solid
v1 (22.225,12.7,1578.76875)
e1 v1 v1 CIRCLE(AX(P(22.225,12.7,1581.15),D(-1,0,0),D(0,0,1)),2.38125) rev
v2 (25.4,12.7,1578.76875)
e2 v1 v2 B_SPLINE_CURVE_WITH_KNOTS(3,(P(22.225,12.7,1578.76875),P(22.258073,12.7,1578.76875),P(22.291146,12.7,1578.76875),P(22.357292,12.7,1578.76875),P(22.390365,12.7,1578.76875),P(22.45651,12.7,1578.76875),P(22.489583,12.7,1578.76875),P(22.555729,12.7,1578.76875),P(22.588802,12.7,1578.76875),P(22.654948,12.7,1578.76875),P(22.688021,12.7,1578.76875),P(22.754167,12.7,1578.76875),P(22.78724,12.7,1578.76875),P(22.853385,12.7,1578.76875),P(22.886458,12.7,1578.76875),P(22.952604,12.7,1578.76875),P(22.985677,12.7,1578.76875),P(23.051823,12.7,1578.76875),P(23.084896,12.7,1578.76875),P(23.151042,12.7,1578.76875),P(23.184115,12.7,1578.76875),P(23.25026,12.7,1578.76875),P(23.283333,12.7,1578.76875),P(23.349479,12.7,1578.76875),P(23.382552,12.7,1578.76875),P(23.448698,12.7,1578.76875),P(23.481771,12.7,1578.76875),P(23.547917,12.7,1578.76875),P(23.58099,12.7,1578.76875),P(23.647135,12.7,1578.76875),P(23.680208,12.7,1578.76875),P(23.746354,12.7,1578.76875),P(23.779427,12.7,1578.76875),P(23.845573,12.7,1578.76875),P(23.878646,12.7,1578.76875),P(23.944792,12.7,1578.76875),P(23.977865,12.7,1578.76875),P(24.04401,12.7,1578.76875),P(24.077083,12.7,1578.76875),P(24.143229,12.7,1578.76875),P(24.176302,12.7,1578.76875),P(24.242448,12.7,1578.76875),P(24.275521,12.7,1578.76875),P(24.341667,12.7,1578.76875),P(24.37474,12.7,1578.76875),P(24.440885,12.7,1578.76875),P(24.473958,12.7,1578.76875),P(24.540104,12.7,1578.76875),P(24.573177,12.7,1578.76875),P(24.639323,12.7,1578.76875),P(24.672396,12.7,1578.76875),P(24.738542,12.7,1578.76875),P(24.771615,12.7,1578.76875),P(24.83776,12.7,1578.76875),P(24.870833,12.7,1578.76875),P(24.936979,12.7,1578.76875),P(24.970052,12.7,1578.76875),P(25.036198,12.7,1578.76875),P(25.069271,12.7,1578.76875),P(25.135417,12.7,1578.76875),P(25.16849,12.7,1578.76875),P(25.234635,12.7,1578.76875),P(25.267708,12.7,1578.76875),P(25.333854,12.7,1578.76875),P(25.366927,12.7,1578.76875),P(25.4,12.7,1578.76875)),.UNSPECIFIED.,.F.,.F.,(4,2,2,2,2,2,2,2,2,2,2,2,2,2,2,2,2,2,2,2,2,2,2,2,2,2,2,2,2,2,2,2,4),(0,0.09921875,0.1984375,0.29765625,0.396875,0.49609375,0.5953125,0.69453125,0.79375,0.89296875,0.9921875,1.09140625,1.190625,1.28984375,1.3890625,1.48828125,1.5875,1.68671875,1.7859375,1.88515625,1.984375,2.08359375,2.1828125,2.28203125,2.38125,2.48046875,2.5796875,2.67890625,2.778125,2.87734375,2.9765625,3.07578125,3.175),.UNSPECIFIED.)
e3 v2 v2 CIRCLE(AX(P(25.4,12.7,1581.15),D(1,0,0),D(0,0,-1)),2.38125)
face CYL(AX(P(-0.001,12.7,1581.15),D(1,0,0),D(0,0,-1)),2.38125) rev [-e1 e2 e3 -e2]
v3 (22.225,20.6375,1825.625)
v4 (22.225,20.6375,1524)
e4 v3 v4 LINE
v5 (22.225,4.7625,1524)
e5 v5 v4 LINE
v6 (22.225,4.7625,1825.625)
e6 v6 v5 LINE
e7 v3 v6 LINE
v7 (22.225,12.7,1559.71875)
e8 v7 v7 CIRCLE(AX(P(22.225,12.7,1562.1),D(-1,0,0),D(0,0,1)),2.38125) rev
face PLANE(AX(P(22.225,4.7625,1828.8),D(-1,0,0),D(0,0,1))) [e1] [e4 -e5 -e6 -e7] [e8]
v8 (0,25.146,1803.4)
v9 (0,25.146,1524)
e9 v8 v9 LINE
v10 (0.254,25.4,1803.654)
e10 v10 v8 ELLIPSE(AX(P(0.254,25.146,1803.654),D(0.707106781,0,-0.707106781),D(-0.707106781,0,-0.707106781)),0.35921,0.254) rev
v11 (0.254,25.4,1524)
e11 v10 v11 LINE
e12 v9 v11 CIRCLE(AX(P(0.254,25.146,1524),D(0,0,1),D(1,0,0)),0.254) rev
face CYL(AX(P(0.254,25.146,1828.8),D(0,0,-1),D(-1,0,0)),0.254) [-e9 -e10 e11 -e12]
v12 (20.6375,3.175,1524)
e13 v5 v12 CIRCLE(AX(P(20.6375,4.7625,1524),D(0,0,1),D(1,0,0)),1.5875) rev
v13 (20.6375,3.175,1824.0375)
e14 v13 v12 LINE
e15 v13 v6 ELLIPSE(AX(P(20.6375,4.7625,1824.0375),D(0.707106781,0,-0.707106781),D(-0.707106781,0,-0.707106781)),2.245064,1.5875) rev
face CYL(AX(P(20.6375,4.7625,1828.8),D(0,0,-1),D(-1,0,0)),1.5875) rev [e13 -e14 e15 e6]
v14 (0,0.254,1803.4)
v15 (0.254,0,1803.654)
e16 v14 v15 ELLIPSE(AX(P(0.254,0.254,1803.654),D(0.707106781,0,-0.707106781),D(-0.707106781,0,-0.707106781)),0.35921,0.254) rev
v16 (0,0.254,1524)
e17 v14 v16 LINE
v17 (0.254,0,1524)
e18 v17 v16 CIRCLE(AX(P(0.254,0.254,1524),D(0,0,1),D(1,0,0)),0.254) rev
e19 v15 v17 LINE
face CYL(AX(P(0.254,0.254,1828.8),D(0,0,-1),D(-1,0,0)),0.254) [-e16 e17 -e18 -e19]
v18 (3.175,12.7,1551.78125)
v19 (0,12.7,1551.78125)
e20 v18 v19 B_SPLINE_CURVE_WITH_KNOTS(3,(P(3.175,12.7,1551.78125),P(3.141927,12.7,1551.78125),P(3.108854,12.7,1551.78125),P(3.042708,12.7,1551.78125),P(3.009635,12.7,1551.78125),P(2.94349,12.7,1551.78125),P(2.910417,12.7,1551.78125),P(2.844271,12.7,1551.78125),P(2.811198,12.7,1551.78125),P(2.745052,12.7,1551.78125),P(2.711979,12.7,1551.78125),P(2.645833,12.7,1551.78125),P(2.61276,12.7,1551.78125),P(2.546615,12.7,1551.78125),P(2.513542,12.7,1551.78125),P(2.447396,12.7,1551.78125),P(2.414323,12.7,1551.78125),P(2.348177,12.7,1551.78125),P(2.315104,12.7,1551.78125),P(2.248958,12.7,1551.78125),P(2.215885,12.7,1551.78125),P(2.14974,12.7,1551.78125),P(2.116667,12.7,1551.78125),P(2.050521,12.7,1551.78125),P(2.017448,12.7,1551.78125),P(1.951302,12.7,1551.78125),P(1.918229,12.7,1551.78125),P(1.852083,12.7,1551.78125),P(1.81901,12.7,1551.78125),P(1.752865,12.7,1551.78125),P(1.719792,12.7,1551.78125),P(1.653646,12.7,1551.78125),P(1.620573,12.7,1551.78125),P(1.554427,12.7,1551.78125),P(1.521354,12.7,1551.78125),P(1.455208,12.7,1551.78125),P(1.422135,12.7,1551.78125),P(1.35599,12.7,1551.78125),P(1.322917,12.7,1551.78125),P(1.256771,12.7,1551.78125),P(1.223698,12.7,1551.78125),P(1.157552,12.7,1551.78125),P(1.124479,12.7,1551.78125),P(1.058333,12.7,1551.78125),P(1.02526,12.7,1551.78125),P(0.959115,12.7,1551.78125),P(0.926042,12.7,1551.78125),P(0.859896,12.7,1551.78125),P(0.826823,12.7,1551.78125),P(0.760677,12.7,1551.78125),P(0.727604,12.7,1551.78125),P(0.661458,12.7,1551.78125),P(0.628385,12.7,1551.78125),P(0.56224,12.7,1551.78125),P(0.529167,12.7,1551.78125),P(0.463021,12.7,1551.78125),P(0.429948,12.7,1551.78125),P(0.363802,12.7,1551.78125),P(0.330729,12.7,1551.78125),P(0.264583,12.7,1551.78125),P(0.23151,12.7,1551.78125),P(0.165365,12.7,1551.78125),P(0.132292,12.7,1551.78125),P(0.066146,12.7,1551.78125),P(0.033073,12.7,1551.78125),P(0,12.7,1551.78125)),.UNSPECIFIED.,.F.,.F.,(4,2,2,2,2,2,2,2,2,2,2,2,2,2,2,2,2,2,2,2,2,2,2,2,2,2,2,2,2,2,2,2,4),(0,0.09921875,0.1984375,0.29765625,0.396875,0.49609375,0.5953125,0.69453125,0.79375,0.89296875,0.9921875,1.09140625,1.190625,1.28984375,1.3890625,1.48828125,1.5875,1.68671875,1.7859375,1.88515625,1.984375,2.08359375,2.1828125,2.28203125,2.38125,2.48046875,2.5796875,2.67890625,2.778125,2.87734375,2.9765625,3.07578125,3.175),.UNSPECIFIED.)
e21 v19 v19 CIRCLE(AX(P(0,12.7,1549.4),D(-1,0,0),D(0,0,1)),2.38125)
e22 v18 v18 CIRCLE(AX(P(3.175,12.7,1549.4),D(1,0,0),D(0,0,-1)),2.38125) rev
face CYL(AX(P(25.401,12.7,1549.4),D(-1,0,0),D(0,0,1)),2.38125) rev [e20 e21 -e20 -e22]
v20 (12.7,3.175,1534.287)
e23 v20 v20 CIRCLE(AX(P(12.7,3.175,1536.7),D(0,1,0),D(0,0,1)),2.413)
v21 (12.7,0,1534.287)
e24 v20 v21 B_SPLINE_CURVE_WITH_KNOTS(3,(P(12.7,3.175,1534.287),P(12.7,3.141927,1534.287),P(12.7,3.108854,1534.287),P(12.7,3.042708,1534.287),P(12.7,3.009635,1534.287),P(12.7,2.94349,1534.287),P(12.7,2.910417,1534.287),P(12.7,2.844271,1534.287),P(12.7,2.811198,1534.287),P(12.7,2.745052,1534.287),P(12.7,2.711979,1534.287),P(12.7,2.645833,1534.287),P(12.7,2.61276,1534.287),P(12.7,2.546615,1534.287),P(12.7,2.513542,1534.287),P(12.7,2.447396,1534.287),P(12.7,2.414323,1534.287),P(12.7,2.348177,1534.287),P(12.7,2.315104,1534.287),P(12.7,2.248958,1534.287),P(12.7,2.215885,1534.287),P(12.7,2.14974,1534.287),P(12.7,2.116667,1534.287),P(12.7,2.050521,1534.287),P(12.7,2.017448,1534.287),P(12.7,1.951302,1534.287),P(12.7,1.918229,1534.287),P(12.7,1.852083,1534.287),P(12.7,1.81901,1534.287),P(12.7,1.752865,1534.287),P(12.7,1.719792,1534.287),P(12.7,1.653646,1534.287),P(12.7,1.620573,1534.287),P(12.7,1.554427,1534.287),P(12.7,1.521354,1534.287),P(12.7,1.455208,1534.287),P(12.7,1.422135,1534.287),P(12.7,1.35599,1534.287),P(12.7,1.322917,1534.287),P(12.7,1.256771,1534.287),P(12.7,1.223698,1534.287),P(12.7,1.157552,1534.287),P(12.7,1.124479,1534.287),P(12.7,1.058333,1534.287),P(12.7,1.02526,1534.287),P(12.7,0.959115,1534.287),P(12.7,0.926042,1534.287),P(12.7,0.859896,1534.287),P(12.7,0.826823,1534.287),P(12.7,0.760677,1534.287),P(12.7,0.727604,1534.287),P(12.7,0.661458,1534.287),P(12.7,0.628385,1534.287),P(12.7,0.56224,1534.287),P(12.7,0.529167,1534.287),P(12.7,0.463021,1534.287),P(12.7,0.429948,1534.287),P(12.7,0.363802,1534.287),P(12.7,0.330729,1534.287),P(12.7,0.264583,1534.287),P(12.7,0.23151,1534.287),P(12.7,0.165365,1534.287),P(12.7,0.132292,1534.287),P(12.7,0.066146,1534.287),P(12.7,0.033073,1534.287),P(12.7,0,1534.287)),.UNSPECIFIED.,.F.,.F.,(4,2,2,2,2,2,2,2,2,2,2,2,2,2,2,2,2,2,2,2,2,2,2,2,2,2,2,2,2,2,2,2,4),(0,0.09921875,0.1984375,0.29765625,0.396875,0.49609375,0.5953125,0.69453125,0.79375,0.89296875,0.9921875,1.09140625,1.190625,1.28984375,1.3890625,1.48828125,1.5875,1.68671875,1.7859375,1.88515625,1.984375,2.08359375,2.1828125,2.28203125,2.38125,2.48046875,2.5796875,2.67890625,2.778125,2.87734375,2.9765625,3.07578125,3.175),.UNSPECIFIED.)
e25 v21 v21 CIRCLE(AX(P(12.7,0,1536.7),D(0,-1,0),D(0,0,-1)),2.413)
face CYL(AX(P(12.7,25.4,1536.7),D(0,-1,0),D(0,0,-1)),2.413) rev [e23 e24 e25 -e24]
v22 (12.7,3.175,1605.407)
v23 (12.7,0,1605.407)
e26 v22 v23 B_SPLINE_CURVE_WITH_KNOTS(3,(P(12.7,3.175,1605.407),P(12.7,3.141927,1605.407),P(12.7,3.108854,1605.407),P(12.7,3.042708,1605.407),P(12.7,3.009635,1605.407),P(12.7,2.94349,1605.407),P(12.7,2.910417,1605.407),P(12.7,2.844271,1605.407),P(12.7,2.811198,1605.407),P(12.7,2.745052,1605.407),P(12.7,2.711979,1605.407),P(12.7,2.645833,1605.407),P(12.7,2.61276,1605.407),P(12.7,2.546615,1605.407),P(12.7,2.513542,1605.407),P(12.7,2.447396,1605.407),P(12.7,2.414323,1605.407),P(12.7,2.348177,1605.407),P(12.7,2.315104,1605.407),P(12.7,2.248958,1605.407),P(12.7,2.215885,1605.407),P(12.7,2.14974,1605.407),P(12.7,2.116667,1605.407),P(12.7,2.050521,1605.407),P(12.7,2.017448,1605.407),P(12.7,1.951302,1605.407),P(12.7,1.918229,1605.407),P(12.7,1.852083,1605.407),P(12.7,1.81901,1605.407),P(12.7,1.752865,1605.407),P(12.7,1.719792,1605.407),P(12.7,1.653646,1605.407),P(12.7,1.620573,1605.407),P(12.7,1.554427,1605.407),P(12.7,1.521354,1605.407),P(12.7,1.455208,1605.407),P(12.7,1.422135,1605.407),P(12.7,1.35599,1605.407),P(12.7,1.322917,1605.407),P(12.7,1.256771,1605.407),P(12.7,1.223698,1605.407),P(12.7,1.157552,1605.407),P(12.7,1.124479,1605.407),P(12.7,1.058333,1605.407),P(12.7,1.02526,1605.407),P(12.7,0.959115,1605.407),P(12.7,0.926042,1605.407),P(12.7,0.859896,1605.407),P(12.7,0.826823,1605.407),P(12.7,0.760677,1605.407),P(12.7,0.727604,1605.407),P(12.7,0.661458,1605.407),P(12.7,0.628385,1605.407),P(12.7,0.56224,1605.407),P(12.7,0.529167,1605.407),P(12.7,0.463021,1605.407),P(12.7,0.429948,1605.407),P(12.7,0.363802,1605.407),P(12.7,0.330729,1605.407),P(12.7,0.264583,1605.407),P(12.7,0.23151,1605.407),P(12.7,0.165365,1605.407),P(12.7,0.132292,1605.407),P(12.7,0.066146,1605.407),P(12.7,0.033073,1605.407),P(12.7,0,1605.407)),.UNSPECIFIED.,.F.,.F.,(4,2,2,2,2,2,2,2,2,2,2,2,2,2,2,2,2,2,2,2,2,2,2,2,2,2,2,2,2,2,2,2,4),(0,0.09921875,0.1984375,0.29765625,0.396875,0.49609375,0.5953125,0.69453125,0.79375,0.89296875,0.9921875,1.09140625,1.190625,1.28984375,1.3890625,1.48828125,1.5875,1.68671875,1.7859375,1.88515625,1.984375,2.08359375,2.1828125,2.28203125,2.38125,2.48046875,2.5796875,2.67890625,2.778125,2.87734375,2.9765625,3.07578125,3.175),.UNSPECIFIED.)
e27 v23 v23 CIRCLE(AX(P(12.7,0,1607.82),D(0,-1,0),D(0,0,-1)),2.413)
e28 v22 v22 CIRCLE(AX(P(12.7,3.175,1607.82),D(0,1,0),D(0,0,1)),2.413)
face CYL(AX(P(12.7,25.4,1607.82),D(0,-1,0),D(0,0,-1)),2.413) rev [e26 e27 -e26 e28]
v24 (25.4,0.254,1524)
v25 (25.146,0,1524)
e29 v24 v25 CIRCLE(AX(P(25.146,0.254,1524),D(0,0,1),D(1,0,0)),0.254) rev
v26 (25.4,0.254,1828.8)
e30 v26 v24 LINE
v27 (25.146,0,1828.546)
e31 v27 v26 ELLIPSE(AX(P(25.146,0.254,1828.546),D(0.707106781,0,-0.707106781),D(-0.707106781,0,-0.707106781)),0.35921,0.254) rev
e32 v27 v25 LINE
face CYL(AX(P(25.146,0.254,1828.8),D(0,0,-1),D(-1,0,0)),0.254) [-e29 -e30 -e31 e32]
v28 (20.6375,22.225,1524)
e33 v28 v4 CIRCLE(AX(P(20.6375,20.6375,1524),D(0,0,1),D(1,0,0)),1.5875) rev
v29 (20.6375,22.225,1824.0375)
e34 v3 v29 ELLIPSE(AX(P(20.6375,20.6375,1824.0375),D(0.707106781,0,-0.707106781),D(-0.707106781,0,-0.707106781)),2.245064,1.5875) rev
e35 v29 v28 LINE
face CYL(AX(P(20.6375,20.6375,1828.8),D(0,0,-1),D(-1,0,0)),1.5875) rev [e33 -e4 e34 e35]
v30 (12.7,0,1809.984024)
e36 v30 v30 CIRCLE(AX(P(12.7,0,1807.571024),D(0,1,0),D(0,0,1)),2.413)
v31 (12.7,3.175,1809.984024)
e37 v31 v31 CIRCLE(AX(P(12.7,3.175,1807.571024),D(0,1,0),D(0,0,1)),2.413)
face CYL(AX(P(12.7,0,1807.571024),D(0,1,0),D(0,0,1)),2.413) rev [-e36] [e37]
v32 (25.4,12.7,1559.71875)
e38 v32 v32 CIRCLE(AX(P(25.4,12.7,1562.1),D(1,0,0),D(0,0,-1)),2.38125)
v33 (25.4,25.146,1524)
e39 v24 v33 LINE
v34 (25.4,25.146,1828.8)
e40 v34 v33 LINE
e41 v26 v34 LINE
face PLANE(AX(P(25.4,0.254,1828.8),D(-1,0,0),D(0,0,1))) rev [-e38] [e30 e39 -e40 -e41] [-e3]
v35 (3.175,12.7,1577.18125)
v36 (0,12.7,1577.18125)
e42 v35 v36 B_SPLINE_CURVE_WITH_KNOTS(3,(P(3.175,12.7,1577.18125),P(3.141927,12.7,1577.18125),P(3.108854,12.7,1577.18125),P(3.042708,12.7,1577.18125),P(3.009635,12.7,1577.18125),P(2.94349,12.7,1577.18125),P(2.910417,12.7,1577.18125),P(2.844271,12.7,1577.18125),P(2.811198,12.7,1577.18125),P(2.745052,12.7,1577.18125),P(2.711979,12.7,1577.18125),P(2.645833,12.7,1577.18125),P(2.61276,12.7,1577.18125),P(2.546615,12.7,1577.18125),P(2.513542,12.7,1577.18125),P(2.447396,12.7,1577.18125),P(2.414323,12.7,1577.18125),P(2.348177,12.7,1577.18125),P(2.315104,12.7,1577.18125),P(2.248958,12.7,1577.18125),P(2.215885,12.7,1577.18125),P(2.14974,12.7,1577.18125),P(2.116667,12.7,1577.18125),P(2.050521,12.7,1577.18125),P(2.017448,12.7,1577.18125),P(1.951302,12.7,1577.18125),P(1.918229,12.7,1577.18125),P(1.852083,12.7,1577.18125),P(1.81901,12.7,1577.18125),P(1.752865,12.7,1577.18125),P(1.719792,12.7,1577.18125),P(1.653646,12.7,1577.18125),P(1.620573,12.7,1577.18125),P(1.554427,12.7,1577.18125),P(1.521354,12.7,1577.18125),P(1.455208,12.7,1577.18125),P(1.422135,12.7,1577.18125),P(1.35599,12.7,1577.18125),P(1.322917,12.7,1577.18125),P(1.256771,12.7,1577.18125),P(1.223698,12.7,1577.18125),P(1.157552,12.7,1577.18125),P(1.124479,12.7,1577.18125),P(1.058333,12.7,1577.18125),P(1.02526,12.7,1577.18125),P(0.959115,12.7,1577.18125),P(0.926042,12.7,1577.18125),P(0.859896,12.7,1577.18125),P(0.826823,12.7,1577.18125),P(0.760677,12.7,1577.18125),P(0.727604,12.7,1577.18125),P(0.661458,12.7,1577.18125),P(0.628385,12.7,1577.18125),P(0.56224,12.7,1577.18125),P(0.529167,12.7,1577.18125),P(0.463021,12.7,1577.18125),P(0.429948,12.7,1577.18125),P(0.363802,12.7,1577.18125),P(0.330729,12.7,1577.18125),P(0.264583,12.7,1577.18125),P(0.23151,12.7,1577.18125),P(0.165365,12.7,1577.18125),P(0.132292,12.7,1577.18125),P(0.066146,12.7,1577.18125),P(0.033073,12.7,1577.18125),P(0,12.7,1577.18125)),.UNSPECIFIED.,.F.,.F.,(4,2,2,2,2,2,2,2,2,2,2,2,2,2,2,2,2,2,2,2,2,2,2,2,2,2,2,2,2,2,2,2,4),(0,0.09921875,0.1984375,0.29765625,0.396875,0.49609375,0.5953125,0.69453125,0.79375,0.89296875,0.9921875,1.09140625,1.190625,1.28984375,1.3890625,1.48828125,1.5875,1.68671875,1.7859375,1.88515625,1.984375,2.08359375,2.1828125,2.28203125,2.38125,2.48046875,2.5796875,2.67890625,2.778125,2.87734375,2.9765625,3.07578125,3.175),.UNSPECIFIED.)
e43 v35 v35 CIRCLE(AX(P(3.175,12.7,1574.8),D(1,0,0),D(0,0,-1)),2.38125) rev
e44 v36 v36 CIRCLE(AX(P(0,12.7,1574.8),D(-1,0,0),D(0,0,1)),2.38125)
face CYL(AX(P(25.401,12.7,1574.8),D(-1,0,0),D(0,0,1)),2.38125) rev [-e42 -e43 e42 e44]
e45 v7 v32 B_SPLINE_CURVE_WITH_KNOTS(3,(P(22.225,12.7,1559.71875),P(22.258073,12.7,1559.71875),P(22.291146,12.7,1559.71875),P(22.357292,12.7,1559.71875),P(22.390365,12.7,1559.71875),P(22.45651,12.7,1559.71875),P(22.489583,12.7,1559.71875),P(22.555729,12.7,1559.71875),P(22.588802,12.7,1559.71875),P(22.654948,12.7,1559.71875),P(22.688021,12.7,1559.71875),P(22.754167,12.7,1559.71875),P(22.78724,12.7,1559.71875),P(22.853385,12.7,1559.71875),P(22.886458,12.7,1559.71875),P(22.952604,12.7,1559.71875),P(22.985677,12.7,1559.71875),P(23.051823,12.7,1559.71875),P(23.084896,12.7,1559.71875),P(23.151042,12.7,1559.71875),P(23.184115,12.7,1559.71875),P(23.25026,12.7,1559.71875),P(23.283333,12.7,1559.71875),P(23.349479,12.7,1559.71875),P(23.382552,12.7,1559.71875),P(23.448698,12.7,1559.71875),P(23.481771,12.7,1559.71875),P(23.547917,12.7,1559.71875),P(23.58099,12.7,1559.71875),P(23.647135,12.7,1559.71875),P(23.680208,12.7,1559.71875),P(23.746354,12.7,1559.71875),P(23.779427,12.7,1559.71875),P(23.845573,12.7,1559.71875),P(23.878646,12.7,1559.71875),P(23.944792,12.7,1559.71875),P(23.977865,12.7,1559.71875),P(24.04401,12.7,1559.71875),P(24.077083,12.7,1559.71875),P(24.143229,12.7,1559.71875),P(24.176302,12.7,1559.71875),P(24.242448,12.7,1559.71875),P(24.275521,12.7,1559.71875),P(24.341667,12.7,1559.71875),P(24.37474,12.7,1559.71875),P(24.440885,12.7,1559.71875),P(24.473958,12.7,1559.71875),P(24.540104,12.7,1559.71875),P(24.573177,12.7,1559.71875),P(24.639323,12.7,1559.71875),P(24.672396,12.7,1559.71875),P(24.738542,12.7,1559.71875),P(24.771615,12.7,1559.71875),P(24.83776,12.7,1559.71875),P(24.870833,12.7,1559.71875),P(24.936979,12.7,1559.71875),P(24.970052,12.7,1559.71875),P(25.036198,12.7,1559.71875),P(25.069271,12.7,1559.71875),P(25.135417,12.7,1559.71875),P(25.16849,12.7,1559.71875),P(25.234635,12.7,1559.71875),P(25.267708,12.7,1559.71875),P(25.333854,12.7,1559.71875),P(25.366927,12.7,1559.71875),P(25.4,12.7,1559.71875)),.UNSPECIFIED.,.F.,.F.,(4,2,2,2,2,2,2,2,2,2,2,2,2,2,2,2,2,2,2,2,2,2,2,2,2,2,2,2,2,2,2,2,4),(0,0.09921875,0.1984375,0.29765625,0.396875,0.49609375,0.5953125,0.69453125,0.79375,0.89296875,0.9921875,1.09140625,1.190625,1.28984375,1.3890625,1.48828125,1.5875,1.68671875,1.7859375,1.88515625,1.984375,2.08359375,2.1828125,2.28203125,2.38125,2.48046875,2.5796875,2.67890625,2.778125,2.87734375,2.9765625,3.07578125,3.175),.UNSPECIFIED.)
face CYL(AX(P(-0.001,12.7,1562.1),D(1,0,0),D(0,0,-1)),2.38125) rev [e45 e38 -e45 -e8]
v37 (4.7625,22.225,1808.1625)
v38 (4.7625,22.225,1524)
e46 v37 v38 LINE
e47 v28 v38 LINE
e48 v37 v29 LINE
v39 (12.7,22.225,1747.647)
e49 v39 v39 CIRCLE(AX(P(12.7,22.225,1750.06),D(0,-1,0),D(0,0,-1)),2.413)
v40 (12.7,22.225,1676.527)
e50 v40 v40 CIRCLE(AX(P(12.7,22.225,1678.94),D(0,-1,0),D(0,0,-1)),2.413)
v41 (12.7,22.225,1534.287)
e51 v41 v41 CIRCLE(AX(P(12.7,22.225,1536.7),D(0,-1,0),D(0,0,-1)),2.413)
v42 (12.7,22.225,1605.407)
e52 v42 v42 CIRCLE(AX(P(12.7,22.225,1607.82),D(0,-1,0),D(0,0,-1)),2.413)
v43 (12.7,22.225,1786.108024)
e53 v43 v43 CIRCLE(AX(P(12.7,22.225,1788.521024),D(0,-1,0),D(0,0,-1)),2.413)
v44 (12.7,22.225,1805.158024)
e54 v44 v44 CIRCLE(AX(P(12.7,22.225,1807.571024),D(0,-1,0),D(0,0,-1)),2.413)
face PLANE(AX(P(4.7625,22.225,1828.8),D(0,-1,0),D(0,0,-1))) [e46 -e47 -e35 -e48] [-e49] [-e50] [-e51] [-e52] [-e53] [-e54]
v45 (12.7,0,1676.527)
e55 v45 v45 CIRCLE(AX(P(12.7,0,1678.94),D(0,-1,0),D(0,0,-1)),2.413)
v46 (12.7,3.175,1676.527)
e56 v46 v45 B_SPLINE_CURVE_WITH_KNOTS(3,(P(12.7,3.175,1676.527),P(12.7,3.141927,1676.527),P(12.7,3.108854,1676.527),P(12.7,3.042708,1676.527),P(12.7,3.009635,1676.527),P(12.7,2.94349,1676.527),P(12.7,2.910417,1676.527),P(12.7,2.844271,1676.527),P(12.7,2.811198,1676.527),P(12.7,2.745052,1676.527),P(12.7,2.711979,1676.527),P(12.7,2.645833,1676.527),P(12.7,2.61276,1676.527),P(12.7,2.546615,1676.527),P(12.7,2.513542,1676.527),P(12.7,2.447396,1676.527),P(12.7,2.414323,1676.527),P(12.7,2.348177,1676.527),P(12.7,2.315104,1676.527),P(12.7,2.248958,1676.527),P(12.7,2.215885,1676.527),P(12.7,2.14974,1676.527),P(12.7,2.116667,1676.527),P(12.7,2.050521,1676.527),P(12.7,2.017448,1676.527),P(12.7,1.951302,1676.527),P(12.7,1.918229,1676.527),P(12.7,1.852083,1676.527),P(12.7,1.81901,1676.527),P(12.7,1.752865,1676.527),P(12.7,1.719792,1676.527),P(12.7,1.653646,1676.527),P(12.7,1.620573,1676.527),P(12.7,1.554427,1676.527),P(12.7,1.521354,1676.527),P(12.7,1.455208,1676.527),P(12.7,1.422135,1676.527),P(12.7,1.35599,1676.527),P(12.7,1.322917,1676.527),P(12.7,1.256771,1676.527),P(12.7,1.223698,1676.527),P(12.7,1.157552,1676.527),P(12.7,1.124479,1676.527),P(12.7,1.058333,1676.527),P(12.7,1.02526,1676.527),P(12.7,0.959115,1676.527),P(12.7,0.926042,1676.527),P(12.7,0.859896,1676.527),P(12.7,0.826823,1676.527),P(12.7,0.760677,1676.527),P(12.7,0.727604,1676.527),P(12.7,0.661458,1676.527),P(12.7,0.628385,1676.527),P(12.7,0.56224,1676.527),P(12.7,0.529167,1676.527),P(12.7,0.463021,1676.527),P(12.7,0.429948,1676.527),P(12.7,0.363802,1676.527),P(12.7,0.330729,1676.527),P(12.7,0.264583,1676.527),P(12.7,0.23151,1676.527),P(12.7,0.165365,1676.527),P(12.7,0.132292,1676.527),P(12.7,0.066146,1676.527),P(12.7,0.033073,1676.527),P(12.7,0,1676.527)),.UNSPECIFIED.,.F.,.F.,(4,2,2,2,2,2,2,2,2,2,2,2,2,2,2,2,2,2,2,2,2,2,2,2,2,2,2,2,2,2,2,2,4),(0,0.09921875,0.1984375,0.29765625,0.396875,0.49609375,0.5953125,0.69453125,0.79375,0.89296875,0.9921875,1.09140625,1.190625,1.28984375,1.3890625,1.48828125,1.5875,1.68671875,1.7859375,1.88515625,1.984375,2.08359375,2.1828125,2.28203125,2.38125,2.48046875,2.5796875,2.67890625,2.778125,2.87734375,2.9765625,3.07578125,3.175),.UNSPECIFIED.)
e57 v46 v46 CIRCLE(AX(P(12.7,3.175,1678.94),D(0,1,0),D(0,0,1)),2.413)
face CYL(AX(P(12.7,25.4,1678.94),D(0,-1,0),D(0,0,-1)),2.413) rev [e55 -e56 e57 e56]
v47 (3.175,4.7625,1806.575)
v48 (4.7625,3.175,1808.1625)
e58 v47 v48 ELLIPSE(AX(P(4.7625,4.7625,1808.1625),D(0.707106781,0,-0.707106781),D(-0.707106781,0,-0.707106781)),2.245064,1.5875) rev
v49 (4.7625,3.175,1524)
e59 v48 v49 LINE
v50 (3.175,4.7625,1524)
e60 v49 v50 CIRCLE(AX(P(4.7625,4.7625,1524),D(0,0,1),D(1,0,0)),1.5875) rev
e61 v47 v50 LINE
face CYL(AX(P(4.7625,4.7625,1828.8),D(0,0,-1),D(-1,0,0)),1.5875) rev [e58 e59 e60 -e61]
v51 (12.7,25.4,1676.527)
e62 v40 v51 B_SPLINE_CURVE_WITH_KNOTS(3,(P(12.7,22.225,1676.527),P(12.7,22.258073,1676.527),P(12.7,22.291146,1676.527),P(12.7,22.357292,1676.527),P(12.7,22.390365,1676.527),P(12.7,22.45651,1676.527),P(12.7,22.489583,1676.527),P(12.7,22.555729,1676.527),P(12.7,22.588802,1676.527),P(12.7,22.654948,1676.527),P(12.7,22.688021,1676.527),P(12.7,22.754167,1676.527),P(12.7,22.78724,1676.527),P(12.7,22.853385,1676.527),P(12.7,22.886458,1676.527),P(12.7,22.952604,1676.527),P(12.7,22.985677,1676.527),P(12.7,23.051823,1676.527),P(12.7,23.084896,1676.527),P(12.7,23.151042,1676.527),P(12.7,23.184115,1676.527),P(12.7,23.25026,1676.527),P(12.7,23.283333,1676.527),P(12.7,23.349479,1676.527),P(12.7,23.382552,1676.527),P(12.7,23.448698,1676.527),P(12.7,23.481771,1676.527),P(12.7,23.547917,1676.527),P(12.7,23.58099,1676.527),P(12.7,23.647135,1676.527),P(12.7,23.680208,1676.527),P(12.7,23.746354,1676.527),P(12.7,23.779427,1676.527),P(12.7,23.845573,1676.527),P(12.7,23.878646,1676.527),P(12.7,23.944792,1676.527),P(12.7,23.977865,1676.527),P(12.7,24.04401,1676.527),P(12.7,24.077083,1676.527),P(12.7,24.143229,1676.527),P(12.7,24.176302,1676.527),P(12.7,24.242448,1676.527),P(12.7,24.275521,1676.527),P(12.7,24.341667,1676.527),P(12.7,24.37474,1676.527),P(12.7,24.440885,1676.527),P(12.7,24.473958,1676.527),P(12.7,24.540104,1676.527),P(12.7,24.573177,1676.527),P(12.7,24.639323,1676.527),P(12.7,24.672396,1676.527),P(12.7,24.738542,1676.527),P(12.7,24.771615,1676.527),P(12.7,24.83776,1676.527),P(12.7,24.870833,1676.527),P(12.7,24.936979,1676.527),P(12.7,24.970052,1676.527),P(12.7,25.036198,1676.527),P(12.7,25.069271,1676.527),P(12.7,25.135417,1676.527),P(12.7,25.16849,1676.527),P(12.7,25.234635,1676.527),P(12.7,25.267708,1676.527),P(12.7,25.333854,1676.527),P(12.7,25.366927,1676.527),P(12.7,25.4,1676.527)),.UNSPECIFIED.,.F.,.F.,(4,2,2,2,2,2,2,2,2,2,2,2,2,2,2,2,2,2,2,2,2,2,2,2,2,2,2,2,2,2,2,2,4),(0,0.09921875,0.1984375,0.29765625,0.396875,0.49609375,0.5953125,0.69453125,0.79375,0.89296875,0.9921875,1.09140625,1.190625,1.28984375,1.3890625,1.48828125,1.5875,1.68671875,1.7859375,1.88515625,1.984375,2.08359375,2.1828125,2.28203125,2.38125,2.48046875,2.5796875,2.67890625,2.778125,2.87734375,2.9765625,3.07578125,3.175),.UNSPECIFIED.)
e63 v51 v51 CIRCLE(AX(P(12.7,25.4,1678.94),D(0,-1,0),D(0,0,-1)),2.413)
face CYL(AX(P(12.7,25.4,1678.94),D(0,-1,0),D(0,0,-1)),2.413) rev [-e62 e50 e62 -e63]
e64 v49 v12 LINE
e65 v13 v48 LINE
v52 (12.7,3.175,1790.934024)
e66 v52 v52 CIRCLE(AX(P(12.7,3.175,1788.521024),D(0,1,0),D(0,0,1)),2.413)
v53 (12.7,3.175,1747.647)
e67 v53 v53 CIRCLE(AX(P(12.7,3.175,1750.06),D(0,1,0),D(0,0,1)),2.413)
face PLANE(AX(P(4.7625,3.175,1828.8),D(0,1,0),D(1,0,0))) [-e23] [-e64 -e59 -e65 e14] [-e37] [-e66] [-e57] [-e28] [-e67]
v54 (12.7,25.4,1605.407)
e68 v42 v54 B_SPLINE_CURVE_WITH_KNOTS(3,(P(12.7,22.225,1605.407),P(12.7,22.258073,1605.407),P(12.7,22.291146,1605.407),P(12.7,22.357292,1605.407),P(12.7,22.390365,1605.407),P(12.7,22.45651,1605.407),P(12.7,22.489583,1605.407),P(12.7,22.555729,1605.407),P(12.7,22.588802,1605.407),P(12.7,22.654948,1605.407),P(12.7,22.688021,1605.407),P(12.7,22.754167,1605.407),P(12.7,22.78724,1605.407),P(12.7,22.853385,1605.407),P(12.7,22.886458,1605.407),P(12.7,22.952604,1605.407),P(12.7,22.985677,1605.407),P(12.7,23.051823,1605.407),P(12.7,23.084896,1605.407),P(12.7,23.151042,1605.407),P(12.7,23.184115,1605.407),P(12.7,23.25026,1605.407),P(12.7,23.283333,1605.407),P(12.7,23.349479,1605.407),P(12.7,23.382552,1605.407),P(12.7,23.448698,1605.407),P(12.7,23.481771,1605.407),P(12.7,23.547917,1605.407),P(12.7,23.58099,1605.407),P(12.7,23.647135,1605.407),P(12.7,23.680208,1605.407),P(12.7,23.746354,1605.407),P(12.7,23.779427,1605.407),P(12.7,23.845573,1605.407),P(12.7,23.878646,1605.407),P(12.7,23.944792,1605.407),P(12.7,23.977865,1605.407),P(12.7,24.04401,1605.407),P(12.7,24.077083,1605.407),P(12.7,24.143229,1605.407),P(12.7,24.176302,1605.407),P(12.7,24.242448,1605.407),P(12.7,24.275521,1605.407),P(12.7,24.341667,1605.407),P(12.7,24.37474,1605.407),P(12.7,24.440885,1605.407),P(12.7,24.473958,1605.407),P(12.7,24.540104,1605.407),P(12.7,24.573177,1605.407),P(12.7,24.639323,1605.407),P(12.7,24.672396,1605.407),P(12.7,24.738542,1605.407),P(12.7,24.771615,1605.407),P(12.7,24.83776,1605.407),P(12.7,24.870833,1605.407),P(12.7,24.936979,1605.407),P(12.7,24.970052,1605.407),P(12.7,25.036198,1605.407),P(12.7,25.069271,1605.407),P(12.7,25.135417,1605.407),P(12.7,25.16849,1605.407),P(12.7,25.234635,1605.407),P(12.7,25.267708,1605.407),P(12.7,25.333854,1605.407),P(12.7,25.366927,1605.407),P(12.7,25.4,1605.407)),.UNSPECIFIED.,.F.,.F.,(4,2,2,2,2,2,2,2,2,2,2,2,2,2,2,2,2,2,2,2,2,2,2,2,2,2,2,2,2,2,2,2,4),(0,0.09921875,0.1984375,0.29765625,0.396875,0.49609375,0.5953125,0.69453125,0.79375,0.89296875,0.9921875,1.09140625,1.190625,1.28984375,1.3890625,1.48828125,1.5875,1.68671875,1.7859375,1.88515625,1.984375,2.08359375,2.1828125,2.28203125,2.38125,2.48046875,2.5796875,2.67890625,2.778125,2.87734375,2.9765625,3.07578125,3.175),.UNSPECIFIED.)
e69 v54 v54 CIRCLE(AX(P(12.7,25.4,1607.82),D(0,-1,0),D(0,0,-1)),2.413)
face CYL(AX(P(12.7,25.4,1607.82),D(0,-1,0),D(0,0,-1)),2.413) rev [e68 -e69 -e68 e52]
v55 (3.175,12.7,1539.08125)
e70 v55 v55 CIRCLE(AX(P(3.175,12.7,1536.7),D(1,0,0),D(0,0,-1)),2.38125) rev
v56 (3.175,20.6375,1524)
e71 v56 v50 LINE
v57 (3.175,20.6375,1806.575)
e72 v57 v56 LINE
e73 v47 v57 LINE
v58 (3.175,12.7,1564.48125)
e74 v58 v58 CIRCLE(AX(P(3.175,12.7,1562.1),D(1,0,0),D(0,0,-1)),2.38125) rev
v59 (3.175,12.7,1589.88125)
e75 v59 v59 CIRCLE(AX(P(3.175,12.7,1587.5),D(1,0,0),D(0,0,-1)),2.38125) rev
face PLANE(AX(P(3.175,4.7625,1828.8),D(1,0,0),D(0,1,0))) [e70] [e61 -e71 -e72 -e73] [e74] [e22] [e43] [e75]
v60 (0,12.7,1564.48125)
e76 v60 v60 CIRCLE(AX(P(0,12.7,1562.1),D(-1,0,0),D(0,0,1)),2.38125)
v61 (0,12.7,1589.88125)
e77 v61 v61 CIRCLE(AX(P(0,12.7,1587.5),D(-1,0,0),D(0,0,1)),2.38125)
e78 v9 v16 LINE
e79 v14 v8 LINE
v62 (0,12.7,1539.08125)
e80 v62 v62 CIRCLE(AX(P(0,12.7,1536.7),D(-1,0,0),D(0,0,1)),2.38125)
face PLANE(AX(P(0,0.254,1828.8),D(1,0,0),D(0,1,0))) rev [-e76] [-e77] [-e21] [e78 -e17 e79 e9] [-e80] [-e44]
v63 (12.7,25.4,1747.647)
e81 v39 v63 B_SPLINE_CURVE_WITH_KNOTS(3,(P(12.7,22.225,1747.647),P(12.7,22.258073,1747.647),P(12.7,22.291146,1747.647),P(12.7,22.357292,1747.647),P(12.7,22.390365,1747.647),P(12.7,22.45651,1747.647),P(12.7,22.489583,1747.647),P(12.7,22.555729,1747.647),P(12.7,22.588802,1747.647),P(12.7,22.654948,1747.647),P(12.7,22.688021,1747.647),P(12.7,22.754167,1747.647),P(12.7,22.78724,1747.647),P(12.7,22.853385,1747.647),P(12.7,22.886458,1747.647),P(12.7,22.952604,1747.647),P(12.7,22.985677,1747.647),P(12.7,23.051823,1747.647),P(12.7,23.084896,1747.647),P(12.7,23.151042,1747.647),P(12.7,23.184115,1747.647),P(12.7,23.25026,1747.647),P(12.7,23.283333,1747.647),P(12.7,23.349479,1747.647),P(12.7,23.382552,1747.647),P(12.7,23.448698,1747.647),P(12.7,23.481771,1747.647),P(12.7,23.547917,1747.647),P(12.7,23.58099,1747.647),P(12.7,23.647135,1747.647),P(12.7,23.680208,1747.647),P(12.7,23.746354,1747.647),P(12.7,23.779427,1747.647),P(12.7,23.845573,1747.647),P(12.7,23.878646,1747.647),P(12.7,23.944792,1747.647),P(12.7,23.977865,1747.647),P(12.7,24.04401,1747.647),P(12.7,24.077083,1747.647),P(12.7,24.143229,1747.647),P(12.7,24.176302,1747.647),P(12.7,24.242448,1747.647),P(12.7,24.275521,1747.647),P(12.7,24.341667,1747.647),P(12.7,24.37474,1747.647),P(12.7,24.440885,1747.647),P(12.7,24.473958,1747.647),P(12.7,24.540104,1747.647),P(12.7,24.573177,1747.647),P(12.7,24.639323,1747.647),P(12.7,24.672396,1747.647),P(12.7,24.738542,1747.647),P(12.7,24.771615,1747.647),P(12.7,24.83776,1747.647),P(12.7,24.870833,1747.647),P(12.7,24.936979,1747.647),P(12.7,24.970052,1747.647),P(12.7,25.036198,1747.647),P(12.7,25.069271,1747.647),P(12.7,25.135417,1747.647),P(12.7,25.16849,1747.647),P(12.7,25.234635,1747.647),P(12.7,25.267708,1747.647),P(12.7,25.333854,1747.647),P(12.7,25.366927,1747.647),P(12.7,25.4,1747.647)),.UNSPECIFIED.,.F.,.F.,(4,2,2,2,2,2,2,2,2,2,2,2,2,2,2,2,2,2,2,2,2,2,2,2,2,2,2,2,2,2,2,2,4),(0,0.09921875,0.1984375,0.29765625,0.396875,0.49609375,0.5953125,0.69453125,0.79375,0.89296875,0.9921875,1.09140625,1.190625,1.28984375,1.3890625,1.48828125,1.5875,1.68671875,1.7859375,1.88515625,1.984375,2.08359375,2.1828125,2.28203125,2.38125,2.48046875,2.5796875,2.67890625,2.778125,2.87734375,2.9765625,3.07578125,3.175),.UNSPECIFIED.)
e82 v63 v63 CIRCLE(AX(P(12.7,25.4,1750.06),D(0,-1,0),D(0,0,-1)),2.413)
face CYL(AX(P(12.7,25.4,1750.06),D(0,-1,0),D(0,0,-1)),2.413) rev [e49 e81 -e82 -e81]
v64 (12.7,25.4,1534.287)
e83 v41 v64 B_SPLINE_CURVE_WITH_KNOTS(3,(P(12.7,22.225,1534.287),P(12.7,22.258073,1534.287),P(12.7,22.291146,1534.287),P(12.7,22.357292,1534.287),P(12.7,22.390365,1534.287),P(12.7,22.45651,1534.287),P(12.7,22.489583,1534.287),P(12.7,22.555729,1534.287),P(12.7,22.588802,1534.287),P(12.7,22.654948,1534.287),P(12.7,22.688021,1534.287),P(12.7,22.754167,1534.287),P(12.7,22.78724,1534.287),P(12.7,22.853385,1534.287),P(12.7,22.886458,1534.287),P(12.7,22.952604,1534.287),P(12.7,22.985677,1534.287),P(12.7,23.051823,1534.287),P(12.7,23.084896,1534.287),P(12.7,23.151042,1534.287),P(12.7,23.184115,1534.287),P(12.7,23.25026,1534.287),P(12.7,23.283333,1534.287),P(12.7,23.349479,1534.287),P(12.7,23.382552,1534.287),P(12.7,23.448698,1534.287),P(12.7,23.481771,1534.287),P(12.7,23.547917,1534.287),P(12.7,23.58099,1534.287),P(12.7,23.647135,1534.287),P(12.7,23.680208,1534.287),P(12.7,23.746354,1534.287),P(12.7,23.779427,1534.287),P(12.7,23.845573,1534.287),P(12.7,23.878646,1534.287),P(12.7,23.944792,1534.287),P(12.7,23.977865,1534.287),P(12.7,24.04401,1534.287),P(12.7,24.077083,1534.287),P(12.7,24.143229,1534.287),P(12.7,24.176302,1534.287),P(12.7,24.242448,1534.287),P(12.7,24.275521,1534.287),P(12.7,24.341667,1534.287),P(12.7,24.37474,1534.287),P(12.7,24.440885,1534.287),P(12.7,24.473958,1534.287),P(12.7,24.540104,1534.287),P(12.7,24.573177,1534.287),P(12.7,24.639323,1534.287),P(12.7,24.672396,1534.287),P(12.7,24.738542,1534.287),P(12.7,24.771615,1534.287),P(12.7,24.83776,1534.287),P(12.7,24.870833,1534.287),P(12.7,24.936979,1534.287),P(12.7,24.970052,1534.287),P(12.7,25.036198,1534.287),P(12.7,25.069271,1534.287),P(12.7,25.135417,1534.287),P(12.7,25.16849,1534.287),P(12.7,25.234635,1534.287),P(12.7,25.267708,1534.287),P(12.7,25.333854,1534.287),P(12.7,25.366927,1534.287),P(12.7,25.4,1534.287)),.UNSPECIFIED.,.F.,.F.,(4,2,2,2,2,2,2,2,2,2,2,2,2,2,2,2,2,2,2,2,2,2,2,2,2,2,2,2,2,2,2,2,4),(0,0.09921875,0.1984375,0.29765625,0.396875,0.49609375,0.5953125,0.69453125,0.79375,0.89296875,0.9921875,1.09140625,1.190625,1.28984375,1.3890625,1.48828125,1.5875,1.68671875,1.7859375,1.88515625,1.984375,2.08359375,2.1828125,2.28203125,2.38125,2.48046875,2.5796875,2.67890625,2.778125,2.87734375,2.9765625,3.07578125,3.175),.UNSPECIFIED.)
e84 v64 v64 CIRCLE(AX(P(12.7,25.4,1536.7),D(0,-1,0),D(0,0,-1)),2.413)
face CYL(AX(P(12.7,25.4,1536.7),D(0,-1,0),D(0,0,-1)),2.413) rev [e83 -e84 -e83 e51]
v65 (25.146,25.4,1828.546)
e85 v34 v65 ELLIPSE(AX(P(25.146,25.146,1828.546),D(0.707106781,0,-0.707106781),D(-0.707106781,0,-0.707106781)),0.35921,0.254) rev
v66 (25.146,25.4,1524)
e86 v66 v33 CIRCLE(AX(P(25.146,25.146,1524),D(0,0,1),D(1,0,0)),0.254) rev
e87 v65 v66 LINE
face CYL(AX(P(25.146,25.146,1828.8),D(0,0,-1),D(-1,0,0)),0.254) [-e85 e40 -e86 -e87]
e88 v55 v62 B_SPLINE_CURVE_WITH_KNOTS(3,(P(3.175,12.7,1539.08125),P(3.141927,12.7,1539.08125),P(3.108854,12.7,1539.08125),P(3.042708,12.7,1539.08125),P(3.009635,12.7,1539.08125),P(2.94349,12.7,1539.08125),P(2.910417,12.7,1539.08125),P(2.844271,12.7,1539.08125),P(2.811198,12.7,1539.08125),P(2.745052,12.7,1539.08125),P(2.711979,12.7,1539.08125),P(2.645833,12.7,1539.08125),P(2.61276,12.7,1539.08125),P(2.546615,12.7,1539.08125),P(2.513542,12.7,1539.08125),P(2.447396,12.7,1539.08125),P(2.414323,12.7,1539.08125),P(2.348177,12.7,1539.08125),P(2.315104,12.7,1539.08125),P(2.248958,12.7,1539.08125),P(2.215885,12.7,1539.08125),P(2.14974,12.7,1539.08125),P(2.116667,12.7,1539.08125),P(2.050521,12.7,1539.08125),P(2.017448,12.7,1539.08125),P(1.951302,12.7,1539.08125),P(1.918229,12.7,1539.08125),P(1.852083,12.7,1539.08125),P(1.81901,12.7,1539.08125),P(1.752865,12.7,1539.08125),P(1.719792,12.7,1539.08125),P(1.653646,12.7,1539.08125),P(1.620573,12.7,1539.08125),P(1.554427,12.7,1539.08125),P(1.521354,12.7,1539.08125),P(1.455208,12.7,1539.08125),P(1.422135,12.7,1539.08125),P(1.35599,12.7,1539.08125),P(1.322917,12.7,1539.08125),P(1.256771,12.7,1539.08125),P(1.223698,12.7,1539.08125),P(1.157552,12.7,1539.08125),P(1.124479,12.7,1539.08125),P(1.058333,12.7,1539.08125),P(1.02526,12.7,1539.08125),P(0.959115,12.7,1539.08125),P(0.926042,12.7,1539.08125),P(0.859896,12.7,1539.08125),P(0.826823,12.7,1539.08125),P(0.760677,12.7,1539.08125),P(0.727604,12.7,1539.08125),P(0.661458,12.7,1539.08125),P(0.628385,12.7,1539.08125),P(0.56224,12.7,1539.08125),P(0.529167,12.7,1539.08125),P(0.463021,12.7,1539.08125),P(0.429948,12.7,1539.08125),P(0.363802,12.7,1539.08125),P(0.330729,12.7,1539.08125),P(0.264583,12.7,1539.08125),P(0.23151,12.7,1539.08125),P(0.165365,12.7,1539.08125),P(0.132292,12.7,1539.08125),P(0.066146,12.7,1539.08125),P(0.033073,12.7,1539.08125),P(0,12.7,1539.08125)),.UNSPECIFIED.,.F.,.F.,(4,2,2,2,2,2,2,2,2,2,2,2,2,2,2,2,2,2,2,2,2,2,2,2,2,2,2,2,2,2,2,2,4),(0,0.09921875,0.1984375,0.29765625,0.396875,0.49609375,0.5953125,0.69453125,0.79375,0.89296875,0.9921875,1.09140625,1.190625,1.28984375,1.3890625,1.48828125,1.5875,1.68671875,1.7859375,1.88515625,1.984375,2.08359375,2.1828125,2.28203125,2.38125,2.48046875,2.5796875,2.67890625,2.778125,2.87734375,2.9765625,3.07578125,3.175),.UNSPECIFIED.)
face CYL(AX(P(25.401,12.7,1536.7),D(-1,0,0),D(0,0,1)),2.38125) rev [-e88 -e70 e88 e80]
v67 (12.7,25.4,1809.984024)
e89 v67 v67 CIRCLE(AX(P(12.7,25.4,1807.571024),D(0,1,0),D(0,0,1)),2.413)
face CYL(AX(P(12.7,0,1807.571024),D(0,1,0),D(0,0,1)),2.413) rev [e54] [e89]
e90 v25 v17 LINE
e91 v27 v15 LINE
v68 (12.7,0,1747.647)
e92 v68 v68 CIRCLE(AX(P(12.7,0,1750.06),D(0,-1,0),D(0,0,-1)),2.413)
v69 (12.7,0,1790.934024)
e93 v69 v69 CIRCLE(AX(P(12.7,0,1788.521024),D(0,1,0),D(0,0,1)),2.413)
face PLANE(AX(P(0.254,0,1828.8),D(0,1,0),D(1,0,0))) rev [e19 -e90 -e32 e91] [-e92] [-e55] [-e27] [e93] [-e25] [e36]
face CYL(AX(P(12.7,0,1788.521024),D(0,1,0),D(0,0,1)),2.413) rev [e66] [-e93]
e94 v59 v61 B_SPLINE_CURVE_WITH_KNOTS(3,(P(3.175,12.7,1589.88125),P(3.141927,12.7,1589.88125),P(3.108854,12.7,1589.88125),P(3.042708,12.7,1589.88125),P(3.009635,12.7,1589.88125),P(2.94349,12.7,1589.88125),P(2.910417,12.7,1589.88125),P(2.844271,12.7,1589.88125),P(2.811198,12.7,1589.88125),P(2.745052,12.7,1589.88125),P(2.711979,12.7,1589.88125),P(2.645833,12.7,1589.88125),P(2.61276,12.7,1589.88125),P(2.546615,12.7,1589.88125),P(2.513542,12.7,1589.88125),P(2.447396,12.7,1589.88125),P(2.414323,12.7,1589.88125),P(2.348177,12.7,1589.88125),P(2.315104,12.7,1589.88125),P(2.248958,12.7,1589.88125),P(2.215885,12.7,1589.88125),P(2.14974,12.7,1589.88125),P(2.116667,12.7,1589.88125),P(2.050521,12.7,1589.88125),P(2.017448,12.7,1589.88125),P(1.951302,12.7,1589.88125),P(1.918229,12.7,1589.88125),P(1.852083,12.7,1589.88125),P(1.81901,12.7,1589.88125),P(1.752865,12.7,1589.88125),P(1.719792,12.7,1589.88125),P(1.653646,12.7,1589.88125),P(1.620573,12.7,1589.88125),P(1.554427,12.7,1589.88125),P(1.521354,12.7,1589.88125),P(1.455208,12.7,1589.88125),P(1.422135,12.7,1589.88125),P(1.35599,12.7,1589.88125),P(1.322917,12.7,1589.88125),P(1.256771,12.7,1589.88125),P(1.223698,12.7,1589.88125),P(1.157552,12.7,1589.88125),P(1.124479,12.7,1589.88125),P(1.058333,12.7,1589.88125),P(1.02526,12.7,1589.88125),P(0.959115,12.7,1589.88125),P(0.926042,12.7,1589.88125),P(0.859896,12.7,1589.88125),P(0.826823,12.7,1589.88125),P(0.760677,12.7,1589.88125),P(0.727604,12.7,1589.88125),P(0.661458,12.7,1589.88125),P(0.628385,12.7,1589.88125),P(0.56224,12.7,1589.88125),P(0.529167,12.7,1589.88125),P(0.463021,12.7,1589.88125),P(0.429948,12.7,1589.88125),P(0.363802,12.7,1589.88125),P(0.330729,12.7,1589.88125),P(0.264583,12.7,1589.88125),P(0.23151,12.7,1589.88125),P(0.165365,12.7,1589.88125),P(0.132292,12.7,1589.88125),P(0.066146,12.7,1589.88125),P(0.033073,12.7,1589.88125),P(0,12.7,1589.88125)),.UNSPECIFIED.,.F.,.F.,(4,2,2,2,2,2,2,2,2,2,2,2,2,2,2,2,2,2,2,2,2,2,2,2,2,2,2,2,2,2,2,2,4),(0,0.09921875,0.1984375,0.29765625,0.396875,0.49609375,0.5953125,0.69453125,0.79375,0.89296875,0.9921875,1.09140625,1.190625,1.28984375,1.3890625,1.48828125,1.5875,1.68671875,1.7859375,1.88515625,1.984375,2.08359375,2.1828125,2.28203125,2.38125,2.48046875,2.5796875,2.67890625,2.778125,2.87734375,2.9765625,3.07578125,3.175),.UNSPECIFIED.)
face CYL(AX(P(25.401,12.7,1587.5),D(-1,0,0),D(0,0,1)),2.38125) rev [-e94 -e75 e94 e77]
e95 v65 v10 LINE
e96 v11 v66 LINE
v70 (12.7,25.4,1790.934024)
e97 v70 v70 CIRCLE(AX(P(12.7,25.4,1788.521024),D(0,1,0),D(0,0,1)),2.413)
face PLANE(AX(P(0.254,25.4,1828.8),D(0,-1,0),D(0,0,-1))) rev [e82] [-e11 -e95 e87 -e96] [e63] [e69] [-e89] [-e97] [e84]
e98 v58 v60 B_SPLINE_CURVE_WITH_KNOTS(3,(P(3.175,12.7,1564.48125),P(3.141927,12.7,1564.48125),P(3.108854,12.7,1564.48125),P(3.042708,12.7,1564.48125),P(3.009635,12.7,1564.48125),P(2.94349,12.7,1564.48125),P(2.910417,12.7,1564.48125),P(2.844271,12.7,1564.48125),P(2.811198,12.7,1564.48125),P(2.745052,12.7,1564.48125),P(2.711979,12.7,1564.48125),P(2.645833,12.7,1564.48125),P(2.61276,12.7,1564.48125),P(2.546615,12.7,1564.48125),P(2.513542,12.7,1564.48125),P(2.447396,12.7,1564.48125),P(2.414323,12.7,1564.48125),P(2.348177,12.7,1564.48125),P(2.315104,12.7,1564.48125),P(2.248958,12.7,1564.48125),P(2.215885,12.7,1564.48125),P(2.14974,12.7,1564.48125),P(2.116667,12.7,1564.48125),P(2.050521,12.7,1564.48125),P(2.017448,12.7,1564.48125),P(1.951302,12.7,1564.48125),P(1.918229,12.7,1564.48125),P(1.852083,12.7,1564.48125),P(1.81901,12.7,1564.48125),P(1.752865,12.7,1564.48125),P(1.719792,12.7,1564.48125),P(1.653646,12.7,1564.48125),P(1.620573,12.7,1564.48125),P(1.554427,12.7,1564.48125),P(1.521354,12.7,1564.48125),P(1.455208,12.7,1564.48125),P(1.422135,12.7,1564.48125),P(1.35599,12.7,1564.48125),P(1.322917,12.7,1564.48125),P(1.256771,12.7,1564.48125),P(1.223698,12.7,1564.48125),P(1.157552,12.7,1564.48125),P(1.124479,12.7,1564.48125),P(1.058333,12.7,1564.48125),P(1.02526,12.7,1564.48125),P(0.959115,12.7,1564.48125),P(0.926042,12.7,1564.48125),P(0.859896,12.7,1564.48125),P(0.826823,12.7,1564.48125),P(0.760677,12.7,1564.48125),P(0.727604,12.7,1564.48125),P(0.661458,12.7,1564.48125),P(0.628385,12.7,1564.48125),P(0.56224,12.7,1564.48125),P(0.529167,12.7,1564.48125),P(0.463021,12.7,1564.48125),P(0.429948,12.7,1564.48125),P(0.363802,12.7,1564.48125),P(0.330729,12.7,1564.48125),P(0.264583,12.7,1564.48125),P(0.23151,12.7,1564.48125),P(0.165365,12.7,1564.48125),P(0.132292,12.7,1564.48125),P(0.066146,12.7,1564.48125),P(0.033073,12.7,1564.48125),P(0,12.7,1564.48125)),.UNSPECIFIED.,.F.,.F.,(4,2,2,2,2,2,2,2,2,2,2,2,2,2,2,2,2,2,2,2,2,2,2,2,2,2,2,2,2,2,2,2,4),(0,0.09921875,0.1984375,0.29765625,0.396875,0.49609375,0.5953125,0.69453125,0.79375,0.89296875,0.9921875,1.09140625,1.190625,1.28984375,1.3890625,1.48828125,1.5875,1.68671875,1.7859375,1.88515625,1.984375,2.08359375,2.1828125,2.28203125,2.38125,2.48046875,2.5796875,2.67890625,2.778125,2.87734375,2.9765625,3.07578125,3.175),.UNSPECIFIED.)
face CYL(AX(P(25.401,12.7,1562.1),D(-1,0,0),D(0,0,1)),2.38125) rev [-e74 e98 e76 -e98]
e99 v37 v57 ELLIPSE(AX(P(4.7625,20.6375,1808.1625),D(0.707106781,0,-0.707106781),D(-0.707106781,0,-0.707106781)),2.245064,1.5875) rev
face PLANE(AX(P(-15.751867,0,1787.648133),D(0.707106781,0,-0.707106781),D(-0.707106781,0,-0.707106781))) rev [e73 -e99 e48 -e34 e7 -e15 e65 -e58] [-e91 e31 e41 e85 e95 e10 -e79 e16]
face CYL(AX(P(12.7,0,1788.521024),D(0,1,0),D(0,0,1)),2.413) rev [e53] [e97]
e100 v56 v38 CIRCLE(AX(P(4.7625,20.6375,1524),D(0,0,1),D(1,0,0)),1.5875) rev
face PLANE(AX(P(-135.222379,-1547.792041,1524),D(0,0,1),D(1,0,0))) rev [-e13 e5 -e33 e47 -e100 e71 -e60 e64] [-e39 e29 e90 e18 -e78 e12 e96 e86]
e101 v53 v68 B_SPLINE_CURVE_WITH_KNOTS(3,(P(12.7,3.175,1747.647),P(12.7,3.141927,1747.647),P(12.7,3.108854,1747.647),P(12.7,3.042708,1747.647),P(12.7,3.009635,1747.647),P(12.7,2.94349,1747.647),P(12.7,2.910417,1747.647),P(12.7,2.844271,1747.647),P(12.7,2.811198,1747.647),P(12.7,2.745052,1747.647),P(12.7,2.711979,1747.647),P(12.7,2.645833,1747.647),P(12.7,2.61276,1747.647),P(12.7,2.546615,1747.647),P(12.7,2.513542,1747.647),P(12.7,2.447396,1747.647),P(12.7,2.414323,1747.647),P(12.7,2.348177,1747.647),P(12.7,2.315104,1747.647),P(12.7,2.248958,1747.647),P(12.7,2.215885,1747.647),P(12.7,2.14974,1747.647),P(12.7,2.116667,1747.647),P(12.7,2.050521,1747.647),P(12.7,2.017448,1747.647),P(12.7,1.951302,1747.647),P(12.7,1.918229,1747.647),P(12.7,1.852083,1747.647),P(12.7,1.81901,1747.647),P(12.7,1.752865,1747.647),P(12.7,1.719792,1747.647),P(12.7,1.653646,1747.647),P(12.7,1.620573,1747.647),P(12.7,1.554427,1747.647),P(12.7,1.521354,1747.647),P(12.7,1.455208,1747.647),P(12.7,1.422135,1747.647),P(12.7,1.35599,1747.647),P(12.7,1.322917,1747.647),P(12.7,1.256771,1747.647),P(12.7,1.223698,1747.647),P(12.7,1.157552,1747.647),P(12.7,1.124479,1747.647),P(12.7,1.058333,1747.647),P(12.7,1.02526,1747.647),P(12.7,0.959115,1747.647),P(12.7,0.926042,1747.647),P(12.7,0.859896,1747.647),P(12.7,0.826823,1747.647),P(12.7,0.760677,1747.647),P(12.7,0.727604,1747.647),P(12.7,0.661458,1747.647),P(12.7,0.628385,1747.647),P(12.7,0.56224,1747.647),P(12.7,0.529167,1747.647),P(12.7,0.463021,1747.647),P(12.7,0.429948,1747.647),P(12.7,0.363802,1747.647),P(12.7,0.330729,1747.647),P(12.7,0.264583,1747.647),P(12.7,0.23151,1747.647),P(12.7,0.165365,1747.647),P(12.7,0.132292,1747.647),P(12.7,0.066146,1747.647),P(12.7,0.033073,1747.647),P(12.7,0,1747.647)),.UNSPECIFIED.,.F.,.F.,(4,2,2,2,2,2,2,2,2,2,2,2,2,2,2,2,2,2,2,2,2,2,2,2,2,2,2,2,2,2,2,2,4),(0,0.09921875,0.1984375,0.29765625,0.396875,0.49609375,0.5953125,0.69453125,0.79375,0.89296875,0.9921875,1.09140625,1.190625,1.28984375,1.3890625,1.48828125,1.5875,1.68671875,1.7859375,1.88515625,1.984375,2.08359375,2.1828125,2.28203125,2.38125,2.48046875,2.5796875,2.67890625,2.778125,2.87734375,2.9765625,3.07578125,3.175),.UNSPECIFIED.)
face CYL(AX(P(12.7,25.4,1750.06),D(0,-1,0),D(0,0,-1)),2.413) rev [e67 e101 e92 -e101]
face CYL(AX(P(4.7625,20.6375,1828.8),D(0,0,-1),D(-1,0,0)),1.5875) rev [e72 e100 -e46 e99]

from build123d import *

# Parameters (mm, degrees)
CUT_EXTRUDE1_START = 1524
CUT_EXTRUDE1_DEPTH = 304.8
CUT_EXTRUDE2_START = -25.4
CUT_EXTRUDE2_DEPTH = 25.4
SKETCH3_R          = 2.413
CUT_EXTRUDE3_DEPTH = 1830.152743759
SKETCH4_R          = 2.413
CUT_EXTRUDE4_DEPTH = 1830.152743759
CUT_EXTRUDE5_REACH = 1831.153
SKETCH5_R          = 2.38125
CUT_EXTRUDE6_REACH = 1831.153
SKETCH6_R          = 2.38125


with BuildPart() as part:
    # Cut-Extrude1: read off the stored shape, not the designer's step
    # Cut-Extrude1 outline → Cut-Extrude1 (new body)
    with BuildSketch(Plane.XY.offset(CUT_EXTRUDE1_START)):
        with BuildLine():
            Line((0, 25.146), (0, 0.254))
            ThreePointArc((0, 0.254), (0.074394878, 0.074394878), (0.254, 0))
            Line((0.254, 0), (25.146, 0))
            ThreePointArc((25.146, 0), (25.325605122, 0.074394878), (25.4, 0.254))
            Line((25.4, 0.254), (25.4, 25.146))
            ThreePointArc((25.4, 25.146), (25.325605122, 25.325605122), (25.146, 25.4))
            Line((25.146, 25.4), (0.254, 25.4))
            ThreePointArc((0.254, 25.4), (0.074394878, 25.325605122), (0, 25.146))
        make_face()
        with BuildLine():
            ThreePointArc((4.7625, 3.175), (3.639967985, 3.639967985), (3.175, 4.7625))
            Line((3.175, 4.7625), (3.175, 20.6375))
            ThreePointArc((3.175, 20.6375), (3.639967985, 21.760032015), (4.7625, 22.225))
            Line((4.7625, 22.225), (20.6375, 22.225))
            ThreePointArc((20.6375, 22.225), (21.760032015, 21.760032015), (22.225, 20.6375))
            Line((22.225, 20.6375), (22.225, 4.7625))
            ThreePointArc((22.225, 4.7625), (21.760032015, 3.639967985), (20.6375, 3.175))
            Line((20.6375, 3.175), (4.7625, 3.175))
        make_face(mode=Mode.SUBTRACT)
    extrude(amount=CUT_EXTRUDE1_DEPTH)

    # Sketch2 → Cut-Extrude2 (cut)
    with BuildSketch(Plane(origin=(0, 25.4, 0), x_dir=(1, 0, 0), z_dir=(0, 1, 0)).offset(CUT_EXTRUDE2_START)):
        Polygon((-15.751867444, -1787.648132556), (56.090181524, -1859.490181524), (20.16915704, -1895.411206008), (-51.672891929, -1823.56915704), align=None)
    extrude(amount=CUT_EXTRUDE2_DEPTH, mode=Mode.SUBTRACT)

    # Sketch3 → Cut-Extrude3 (cut, through all)
    with BuildSketch(Plane.XZ):
        with Locations(Location((12.7, 1536.7, 0), (0, 0, 270))):
            Circle(SKETCH3_R)
        with Locations(Location((12.7, 1607.82, 0), (0, 0, 270))):
            Circle(SKETCH3_R)
        with Locations(Location((12.7, 1678.94, 0), (0, 0, 270))):
            Circle(SKETCH3_R)
        with Locations(Location((12.7, 1750.06, 0), (0, 0, 270))):
            Circle(SKETCH3_R)
    extrude(amount=-CUT_EXTRUDE3_DEPTH, mode=Mode.SUBTRACT)

    # Sketch4 → Cut-Extrude4 (cut, through all)
    with BuildSketch(Plane(origin=(0, 25.4, 0), x_dir=(1, 0, 0), z_dir=(0, 1, 0))):
        with Locations(Location((12.7, -1807.571024484, 0), (0, 0, 270))):
            Circle(SKETCH4_R)
        with Locations(Location((12.7, -1788.521024484, 0), (0, 0, 270))):
            Circle(SKETCH4_R)
    extrude(amount=-CUT_EXTRUDE4_DEPTH, mode=Mode.SUBTRACT)

    # Sketch5 → Cut-Extrude5 (cut, up to next)
    with BuildSketch(Plane.ZY, mode=Mode.PRIVATE) as cut_extrude5_sk1:
        with Locations((1536.7, 12.7)):
            Circle(SKETCH5_R)
    cut_extrude5_tool1 = extrude(cut_extrude5_sk1.sketch, amount=-CUT_EXTRUDE5_REACH, mode=Mode.PRIVATE) & part.part
    # Sketch5 → Cut-Extrude5 (cut, up to next)
    with BuildSketch(Plane.ZY, mode=Mode.PRIVATE) as cut_extrude5_sk2:
        with Locations((1549.4, 12.7)):
            Circle(SKETCH5_R)
    cut_extrude5_tool2 = extrude(cut_extrude5_sk2.sketch, amount=-CUT_EXTRUDE5_REACH, mode=Mode.PRIVATE) & part.part
    # Sketch5 → Cut-Extrude5 (cut, up to next)
    with BuildSketch(Plane.ZY, mode=Mode.PRIVATE) as cut_extrude5_sk3:
        with Locations((1562.1, 12.7)):
            Circle(SKETCH5_R)
    cut_extrude5_tool3 = extrude(cut_extrude5_sk3.sketch, amount=-CUT_EXTRUDE5_REACH, mode=Mode.PRIVATE) & part.part
    # Sketch5 → Cut-Extrude5 (cut, up to next)
    with BuildSketch(Plane.ZY, mode=Mode.PRIVATE) as cut_extrude5_sk4:
        with Locations((1574.8, 12.7)):
            Circle(SKETCH5_R)
    cut_extrude5_tool4 = extrude(cut_extrude5_sk4.sketch, amount=-CUT_EXTRUDE5_REACH, mode=Mode.PRIVATE) & part.part
    # Sketch5 → Cut-Extrude5 (cut, up to next)
    with BuildSketch(Plane.ZY, mode=Mode.PRIVATE) as cut_extrude5_sk5:
        with Locations((1587.5, 12.7)):
            Circle(SKETCH5_R)
    cut_extrude5_tool5 = extrude(cut_extrude5_sk5.sketch, amount=-CUT_EXTRUDE5_REACH, mode=Mode.PRIVATE) & part.part
    add(cut_extrude5_tool1.solids().sort_by_distance((0, 12.7, 1536.7))[0], mode=Mode.SUBTRACT)
    add(cut_extrude5_tool2.solids().sort_by_distance((0, 12.7, 1549.4))[0], mode=Mode.SUBTRACT)
    add(cut_extrude5_tool3.solids().sort_by_distance((0, 12.7, 1562.1))[0], mode=Mode.SUBTRACT)
    add(cut_extrude5_tool4.solids().sort_by_distance((0, 12.7, 1574.8))[0], mode=Mode.SUBTRACT)
    add(cut_extrude5_tool5.solids().sort_by_distance((0, 12.7, 1587.5))[0], mode=Mode.SUBTRACT)

    # Sketch6 → Cut-Extrude6 (cut, up to next)
    with BuildSketch(Plane(origin=(25.4, 0, 0), x_dir=(0, 0, -1), z_dir=(1, 0, 0)), mode=Mode.PRIVATE) as cut_extrude6_sk1:
        with Locations(Location((-1562.1, 12.7, 0), (0, 0, 180))):
            Circle(SKETCH6_R)
    cut_extrude6_tool1 = extrude(cut_extrude6_sk1.sketch, amount=-CUT_EXTRUDE6_REACH, mode=Mode.PRIVATE) & part.part
    # Sketch6 → Cut-Extrude6 (cut, up to next)
    with BuildSketch(Plane(origin=(25.4, 0, 0), x_dir=(0, 0, -1), z_dir=(1, 0, 0)), mode=Mode.PRIVATE) as cut_extrude6_sk2:
        with Locations((-1581.15, 12.7)):
            Circle(SKETCH6_R)
    cut_extrude6_tool2 = extrude(cut_extrude6_sk2.sketch, amount=-CUT_EXTRUDE6_REACH, mode=Mode.PRIVATE) & part.part
    add(cut_extrude6_tool1.solids().sort_by_distance((25.4, 12.7, 1562.1))[0], mode=Mode.SUBTRACT)
    add(cut_extrude6_tool2.solids().sort_by_distance((25.4, 12.7, 1581.15))[0], mode=Mode.SUBTRACT)


solid = part.part
